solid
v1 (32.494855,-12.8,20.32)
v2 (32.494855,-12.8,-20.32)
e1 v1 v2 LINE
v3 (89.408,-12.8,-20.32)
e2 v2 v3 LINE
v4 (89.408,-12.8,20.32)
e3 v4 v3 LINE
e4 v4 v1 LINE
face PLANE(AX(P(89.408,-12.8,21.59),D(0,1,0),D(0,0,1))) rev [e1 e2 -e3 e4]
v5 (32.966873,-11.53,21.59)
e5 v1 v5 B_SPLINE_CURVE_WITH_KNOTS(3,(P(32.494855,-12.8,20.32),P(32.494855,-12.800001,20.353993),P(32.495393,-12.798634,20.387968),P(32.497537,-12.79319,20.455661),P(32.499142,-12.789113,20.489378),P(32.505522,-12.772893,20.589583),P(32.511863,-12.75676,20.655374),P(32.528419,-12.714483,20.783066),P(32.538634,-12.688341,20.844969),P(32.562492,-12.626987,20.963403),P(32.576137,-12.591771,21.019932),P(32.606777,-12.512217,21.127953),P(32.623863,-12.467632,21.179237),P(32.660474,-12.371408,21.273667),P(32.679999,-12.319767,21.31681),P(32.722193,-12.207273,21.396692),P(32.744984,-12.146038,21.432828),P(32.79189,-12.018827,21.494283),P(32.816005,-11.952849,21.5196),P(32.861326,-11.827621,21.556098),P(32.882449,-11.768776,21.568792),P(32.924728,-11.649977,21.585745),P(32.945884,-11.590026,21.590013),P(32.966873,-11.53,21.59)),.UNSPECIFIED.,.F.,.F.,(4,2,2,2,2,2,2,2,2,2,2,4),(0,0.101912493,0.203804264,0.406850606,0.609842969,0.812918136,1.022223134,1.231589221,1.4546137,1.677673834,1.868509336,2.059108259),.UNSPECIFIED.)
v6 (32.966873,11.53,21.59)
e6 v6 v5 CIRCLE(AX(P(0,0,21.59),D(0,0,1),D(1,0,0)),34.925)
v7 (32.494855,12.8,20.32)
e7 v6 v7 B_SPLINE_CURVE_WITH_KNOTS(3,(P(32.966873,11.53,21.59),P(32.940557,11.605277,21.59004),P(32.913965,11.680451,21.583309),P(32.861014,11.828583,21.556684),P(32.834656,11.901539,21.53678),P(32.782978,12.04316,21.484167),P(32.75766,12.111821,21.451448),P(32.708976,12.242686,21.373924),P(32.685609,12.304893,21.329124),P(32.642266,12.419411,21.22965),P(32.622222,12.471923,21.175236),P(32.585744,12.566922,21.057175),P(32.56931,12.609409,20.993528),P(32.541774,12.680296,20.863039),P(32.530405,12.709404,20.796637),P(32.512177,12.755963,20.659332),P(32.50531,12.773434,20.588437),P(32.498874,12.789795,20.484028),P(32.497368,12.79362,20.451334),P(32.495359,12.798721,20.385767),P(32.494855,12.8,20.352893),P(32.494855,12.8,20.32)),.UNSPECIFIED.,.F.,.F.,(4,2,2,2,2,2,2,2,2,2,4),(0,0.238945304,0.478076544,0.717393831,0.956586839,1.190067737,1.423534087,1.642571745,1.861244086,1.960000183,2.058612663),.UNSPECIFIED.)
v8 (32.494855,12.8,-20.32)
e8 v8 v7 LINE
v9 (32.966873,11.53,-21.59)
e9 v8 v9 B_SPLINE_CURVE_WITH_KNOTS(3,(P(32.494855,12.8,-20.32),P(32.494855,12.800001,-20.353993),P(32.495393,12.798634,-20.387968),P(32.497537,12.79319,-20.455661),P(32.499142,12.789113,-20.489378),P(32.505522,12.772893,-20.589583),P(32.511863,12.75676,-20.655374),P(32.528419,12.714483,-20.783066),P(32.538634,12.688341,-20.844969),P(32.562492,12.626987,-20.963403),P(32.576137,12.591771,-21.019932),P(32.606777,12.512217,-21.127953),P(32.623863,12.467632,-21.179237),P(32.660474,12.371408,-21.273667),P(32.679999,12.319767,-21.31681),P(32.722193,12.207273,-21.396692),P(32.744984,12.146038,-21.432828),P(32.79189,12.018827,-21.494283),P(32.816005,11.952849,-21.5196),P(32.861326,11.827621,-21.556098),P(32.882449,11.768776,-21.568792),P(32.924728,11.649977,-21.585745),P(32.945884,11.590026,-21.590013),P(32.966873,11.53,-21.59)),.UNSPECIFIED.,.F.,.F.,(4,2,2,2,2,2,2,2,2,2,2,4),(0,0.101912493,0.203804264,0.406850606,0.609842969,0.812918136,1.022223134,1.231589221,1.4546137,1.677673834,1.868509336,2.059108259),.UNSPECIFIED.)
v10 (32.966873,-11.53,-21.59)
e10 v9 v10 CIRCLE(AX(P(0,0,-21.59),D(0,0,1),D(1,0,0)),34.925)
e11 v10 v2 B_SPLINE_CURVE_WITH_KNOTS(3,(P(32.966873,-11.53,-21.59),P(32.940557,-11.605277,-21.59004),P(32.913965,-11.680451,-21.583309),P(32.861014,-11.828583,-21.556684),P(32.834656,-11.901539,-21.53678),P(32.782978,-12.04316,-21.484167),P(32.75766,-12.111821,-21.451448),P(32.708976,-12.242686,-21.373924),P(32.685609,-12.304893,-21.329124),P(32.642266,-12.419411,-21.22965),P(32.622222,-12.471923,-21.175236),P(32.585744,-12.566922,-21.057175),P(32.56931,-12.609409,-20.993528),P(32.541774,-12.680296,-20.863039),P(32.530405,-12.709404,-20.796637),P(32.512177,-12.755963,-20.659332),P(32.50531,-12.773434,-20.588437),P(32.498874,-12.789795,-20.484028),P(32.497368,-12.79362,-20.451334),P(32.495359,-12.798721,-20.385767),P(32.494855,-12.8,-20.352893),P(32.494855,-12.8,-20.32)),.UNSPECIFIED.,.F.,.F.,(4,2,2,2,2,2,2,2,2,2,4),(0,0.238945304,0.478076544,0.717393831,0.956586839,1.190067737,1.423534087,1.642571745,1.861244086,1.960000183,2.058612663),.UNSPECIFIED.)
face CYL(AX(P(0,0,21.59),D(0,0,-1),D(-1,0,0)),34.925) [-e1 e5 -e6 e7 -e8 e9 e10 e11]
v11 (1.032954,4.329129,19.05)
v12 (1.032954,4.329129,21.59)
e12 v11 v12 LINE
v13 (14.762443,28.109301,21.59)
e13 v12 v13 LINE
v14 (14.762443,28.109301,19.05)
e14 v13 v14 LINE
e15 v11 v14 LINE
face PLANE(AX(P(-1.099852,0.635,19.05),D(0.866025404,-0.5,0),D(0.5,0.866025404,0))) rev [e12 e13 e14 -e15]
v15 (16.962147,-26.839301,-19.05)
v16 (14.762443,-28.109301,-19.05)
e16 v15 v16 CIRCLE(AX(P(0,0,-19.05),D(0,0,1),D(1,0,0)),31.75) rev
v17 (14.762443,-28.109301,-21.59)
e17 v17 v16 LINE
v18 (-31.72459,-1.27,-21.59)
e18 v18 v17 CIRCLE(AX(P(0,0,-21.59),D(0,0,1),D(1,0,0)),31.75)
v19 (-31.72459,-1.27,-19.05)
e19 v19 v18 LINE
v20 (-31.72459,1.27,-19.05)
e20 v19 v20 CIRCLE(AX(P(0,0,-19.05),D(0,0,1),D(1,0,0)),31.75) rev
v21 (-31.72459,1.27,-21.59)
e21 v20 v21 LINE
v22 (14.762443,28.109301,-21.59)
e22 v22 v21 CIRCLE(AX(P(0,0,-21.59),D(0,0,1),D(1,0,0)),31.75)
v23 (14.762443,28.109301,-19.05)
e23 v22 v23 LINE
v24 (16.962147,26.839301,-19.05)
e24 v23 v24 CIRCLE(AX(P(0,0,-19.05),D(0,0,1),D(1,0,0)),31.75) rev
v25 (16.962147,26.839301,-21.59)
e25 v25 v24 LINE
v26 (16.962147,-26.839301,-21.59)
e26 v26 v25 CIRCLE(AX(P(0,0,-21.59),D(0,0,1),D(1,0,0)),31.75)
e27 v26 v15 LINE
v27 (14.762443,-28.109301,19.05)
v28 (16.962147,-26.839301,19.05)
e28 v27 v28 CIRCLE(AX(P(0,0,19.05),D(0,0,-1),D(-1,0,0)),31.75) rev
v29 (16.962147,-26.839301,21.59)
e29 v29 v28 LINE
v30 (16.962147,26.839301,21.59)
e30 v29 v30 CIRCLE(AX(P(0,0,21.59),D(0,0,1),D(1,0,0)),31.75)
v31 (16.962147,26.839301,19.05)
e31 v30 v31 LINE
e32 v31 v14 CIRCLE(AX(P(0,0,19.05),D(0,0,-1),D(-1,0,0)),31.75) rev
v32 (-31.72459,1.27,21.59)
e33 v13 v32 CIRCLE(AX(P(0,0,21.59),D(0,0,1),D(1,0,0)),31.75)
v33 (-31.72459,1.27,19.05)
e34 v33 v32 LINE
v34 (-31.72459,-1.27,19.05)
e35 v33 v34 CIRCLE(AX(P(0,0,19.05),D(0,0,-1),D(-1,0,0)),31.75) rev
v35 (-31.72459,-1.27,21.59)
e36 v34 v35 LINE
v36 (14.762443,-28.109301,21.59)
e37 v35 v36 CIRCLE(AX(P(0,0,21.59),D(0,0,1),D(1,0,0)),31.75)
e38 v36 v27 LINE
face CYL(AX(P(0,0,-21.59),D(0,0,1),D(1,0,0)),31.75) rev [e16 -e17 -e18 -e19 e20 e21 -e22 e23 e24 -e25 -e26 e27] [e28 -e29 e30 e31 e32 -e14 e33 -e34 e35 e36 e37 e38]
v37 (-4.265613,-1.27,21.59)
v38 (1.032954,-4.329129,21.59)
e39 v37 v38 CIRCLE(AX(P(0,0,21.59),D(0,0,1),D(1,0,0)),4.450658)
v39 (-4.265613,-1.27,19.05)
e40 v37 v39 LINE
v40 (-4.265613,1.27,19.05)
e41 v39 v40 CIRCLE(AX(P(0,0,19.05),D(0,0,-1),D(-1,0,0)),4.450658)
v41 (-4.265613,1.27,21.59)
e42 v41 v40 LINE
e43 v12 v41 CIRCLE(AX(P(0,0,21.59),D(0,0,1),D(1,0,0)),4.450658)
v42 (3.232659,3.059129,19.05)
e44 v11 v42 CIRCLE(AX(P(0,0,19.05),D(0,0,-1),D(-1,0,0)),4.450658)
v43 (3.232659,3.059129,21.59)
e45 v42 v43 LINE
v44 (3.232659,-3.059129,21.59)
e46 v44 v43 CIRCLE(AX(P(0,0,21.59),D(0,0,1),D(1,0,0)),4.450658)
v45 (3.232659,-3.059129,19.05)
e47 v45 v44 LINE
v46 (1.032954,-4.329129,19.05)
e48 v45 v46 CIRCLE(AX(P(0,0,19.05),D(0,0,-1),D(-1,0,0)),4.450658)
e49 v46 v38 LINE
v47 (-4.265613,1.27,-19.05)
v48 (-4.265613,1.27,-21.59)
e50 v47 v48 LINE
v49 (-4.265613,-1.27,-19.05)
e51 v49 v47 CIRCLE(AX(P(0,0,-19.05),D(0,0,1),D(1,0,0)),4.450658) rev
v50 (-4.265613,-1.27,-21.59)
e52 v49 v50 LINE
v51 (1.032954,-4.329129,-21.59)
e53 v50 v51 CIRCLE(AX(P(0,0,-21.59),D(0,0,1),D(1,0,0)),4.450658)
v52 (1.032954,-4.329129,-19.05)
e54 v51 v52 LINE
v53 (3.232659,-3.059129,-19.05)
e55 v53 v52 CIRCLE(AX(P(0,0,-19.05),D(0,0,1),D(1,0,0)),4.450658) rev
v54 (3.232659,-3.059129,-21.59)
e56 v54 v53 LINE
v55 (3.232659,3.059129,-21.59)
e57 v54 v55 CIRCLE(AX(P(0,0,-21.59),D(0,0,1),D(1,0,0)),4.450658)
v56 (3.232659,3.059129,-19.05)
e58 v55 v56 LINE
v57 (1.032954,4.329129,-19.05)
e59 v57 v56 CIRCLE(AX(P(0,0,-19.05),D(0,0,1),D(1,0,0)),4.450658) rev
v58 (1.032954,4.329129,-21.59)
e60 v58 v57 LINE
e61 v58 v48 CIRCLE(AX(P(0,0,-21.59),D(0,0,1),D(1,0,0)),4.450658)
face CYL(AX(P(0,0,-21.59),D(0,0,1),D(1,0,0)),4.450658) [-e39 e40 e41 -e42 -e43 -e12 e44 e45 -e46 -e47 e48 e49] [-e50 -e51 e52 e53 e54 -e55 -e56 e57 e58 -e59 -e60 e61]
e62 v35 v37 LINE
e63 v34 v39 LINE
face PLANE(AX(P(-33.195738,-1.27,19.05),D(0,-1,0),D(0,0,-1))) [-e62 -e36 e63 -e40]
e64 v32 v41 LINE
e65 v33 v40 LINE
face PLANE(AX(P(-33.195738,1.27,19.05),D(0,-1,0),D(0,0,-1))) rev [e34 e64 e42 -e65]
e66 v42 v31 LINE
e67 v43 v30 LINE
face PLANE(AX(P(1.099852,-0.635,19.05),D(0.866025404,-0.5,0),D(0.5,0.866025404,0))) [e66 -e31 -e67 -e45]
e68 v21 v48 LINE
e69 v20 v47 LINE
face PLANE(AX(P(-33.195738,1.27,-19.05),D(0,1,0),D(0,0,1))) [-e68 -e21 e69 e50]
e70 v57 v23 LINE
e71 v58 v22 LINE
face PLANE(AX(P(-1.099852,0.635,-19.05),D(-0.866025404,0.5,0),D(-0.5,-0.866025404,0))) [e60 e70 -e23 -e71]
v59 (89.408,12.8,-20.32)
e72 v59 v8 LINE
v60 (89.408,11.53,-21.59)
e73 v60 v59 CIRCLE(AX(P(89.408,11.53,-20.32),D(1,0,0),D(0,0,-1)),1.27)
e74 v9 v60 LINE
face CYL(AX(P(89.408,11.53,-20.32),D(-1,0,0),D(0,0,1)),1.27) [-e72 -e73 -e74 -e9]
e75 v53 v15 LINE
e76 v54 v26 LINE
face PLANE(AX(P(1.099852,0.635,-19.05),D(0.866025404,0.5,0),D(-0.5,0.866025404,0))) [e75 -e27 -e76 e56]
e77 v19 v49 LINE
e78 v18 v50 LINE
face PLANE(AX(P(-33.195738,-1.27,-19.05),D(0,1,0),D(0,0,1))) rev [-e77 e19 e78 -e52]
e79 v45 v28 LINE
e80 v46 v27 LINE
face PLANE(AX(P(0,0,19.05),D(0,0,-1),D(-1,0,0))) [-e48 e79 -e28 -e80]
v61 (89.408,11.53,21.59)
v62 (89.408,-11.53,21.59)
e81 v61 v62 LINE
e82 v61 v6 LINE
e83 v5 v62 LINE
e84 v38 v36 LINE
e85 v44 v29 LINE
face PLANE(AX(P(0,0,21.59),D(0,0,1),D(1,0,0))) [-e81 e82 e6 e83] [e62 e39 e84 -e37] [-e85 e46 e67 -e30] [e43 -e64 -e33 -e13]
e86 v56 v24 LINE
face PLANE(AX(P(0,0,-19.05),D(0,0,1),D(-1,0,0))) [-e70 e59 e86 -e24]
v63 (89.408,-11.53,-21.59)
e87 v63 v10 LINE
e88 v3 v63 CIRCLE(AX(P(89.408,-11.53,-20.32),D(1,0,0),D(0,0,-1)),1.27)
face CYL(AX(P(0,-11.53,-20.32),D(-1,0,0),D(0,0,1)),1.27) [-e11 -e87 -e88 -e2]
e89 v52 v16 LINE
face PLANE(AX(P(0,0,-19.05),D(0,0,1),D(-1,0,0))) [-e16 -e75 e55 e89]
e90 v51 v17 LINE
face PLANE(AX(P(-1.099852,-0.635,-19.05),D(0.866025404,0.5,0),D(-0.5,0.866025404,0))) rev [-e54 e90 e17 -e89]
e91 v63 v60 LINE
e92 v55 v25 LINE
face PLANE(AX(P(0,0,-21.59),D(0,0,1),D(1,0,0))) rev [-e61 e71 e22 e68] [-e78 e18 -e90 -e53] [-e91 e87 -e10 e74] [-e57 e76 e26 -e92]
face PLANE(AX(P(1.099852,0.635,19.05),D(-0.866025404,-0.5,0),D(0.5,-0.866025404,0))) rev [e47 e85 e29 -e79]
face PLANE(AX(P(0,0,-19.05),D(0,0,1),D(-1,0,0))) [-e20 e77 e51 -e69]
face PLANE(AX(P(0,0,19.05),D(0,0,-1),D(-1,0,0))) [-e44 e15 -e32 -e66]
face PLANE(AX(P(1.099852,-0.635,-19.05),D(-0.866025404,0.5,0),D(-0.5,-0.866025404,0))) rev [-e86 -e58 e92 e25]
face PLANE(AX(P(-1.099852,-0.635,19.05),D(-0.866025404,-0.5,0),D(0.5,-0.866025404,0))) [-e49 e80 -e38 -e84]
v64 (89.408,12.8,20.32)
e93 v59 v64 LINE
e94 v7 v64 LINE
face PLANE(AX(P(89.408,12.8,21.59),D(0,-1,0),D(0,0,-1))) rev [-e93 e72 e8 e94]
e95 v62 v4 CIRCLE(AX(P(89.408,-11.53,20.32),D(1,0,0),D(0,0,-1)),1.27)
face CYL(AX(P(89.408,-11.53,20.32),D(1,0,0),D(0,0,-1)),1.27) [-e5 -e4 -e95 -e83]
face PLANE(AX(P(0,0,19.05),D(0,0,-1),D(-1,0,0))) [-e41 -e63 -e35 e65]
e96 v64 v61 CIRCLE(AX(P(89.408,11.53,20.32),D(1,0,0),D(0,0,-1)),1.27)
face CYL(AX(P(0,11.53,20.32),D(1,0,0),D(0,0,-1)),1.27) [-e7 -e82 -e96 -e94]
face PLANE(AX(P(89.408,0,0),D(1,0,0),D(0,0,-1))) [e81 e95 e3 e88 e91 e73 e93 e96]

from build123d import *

# Parameters (mm, degrees)
SKETCH1_R           = 34.925
BOSS_EXTRUDE1_DEPTH = 21.59
SKETCH2_W           = 43.18
SKETCH2_H           = 25.6
BOSS_EXTRUDE2_DEPTH = 89.408
SKETCH3_R           = 31.75
CUT_EXTRUDE1_DEPTH  = 106.252356216
SKETCH4_R           = 4.450657561
BOSS_EXTRUDE3_DEPTH = 43.18
EXTRUDE_THIN1_START = -2.54
EXTRUDE_THIN1_DEPTH = 2.54
FILLET1_R           = 1.27


# Read off the part's stored shape, not the designer's step: Extrude-Thin1
with BuildPart() as part:
    # Sketch1 → Boss-Extrude1 (new, symmetric)
    with BuildSketch(Plane.XY):
        Circle(SKETCH1_R)
    extrude(amount=BOSS_EXTRUDE1_DEPTH, both=True)

    # Sketch2 → Boss-Extrude2 (add)
    with BuildSketch(Plane(origin=(0, 0, 0), x_dir=(0, 0, -1), z_dir=(1, 0, 0))):
        Rectangle(SKETCH2_W, SKETCH2_H)
    extrude(amount=BOSS_EXTRUDE2_DEPTH)

    # Sketch3 → Cut-Extrude1 (cut, through all)
    with BuildSketch(Plane.XY.offset(21.59)):
        Circle(SKETCH3_R)
    extrude(amount=-CUT_EXTRUDE1_DEPTH, mode=Mode.SUBTRACT)



with BuildPart() as body_2:
    # Sketch4 → Boss-Extrude3 (new body)
    with BuildSketch(Plane.XY.offset(21.59)):
        Circle(SKETCH4_R)
    extrude(amount=-BOSS_EXTRUDE3_DEPTH)


with BuildPart() as part_1:
    add(part.part)

    add(body_2.part)  # Extrude-Thin1 merges body 2
    # Extrude-Thin1 outline → Extrude-Thin1 (add)
    with BuildSketch(Plane.XY.offset(21.59).offset(EXTRUDE_THIN1_START)):
        with BuildLine():
            ThreePointArc((-31.724589832, 1.27), (-31.75, 0), (-31.724589832, -1.27))
            Line((-31.724589832, -1.27), (-4.265612819, -1.27))
            ThreePointArc((-4.265612819, -1.27), (-4.450657561, 0), (-4.265612819, 1.27))
            Line((-4.265612819, 1.27), (-31.724589832, 1.27))
        make_face()
        with BuildLine():
            Line((1.032954147, -4.329129064), (14.762442653, -28.109300719))
            ThreePointArc((14.762442653, -28.109300719), (15.875, -27.49630657), (16.962147179, -26.839300719))
            Line((16.962147179, -26.839300719), (3.232658672, -3.059129064))
            ThreePointArc((3.232658672, -3.059129064), (2.225328781, -3.854382511), (1.032954147, -4.329129064))
        make_face()
        with BuildLine():
            ThreePointArc((16.962147179, 26.839300719), (15.875, 27.49630657), (14.762442653, 28.109300719))
            Line((14.762442653, 28.109300719), (1.032954147, 4.329129064))
            ThreePointArc((1.032954147, 4.329129064), (2.225328781, 3.854382511), (3.232658672, 3.059129064))
            Line((3.232658672, 3.059129064), (16.962147179, 26.839300719))
        make_face()
    extrude_thin1 = extrude(amount=EXTRUDE_THIN1_DEPTH)

    # Mirror1: Extrude-Thin1 across plane
    add(extrude_thin1.mirror(Plane.XY))

    # Fillet1
    fillet1_edges = [part_1.edges().sort_by_distance(p)[0] for p in [
        (60.951427681, 12.8, -21.59),
        (60.951427681, -12.8, 21.59),
        (60.951427681, -12.8, -21.59),
        (60.951427681, 12.8, 21.59),
    ]]
    fillet(fillet1_edges, radius=FILLET1_R)


solid = part_1.part
